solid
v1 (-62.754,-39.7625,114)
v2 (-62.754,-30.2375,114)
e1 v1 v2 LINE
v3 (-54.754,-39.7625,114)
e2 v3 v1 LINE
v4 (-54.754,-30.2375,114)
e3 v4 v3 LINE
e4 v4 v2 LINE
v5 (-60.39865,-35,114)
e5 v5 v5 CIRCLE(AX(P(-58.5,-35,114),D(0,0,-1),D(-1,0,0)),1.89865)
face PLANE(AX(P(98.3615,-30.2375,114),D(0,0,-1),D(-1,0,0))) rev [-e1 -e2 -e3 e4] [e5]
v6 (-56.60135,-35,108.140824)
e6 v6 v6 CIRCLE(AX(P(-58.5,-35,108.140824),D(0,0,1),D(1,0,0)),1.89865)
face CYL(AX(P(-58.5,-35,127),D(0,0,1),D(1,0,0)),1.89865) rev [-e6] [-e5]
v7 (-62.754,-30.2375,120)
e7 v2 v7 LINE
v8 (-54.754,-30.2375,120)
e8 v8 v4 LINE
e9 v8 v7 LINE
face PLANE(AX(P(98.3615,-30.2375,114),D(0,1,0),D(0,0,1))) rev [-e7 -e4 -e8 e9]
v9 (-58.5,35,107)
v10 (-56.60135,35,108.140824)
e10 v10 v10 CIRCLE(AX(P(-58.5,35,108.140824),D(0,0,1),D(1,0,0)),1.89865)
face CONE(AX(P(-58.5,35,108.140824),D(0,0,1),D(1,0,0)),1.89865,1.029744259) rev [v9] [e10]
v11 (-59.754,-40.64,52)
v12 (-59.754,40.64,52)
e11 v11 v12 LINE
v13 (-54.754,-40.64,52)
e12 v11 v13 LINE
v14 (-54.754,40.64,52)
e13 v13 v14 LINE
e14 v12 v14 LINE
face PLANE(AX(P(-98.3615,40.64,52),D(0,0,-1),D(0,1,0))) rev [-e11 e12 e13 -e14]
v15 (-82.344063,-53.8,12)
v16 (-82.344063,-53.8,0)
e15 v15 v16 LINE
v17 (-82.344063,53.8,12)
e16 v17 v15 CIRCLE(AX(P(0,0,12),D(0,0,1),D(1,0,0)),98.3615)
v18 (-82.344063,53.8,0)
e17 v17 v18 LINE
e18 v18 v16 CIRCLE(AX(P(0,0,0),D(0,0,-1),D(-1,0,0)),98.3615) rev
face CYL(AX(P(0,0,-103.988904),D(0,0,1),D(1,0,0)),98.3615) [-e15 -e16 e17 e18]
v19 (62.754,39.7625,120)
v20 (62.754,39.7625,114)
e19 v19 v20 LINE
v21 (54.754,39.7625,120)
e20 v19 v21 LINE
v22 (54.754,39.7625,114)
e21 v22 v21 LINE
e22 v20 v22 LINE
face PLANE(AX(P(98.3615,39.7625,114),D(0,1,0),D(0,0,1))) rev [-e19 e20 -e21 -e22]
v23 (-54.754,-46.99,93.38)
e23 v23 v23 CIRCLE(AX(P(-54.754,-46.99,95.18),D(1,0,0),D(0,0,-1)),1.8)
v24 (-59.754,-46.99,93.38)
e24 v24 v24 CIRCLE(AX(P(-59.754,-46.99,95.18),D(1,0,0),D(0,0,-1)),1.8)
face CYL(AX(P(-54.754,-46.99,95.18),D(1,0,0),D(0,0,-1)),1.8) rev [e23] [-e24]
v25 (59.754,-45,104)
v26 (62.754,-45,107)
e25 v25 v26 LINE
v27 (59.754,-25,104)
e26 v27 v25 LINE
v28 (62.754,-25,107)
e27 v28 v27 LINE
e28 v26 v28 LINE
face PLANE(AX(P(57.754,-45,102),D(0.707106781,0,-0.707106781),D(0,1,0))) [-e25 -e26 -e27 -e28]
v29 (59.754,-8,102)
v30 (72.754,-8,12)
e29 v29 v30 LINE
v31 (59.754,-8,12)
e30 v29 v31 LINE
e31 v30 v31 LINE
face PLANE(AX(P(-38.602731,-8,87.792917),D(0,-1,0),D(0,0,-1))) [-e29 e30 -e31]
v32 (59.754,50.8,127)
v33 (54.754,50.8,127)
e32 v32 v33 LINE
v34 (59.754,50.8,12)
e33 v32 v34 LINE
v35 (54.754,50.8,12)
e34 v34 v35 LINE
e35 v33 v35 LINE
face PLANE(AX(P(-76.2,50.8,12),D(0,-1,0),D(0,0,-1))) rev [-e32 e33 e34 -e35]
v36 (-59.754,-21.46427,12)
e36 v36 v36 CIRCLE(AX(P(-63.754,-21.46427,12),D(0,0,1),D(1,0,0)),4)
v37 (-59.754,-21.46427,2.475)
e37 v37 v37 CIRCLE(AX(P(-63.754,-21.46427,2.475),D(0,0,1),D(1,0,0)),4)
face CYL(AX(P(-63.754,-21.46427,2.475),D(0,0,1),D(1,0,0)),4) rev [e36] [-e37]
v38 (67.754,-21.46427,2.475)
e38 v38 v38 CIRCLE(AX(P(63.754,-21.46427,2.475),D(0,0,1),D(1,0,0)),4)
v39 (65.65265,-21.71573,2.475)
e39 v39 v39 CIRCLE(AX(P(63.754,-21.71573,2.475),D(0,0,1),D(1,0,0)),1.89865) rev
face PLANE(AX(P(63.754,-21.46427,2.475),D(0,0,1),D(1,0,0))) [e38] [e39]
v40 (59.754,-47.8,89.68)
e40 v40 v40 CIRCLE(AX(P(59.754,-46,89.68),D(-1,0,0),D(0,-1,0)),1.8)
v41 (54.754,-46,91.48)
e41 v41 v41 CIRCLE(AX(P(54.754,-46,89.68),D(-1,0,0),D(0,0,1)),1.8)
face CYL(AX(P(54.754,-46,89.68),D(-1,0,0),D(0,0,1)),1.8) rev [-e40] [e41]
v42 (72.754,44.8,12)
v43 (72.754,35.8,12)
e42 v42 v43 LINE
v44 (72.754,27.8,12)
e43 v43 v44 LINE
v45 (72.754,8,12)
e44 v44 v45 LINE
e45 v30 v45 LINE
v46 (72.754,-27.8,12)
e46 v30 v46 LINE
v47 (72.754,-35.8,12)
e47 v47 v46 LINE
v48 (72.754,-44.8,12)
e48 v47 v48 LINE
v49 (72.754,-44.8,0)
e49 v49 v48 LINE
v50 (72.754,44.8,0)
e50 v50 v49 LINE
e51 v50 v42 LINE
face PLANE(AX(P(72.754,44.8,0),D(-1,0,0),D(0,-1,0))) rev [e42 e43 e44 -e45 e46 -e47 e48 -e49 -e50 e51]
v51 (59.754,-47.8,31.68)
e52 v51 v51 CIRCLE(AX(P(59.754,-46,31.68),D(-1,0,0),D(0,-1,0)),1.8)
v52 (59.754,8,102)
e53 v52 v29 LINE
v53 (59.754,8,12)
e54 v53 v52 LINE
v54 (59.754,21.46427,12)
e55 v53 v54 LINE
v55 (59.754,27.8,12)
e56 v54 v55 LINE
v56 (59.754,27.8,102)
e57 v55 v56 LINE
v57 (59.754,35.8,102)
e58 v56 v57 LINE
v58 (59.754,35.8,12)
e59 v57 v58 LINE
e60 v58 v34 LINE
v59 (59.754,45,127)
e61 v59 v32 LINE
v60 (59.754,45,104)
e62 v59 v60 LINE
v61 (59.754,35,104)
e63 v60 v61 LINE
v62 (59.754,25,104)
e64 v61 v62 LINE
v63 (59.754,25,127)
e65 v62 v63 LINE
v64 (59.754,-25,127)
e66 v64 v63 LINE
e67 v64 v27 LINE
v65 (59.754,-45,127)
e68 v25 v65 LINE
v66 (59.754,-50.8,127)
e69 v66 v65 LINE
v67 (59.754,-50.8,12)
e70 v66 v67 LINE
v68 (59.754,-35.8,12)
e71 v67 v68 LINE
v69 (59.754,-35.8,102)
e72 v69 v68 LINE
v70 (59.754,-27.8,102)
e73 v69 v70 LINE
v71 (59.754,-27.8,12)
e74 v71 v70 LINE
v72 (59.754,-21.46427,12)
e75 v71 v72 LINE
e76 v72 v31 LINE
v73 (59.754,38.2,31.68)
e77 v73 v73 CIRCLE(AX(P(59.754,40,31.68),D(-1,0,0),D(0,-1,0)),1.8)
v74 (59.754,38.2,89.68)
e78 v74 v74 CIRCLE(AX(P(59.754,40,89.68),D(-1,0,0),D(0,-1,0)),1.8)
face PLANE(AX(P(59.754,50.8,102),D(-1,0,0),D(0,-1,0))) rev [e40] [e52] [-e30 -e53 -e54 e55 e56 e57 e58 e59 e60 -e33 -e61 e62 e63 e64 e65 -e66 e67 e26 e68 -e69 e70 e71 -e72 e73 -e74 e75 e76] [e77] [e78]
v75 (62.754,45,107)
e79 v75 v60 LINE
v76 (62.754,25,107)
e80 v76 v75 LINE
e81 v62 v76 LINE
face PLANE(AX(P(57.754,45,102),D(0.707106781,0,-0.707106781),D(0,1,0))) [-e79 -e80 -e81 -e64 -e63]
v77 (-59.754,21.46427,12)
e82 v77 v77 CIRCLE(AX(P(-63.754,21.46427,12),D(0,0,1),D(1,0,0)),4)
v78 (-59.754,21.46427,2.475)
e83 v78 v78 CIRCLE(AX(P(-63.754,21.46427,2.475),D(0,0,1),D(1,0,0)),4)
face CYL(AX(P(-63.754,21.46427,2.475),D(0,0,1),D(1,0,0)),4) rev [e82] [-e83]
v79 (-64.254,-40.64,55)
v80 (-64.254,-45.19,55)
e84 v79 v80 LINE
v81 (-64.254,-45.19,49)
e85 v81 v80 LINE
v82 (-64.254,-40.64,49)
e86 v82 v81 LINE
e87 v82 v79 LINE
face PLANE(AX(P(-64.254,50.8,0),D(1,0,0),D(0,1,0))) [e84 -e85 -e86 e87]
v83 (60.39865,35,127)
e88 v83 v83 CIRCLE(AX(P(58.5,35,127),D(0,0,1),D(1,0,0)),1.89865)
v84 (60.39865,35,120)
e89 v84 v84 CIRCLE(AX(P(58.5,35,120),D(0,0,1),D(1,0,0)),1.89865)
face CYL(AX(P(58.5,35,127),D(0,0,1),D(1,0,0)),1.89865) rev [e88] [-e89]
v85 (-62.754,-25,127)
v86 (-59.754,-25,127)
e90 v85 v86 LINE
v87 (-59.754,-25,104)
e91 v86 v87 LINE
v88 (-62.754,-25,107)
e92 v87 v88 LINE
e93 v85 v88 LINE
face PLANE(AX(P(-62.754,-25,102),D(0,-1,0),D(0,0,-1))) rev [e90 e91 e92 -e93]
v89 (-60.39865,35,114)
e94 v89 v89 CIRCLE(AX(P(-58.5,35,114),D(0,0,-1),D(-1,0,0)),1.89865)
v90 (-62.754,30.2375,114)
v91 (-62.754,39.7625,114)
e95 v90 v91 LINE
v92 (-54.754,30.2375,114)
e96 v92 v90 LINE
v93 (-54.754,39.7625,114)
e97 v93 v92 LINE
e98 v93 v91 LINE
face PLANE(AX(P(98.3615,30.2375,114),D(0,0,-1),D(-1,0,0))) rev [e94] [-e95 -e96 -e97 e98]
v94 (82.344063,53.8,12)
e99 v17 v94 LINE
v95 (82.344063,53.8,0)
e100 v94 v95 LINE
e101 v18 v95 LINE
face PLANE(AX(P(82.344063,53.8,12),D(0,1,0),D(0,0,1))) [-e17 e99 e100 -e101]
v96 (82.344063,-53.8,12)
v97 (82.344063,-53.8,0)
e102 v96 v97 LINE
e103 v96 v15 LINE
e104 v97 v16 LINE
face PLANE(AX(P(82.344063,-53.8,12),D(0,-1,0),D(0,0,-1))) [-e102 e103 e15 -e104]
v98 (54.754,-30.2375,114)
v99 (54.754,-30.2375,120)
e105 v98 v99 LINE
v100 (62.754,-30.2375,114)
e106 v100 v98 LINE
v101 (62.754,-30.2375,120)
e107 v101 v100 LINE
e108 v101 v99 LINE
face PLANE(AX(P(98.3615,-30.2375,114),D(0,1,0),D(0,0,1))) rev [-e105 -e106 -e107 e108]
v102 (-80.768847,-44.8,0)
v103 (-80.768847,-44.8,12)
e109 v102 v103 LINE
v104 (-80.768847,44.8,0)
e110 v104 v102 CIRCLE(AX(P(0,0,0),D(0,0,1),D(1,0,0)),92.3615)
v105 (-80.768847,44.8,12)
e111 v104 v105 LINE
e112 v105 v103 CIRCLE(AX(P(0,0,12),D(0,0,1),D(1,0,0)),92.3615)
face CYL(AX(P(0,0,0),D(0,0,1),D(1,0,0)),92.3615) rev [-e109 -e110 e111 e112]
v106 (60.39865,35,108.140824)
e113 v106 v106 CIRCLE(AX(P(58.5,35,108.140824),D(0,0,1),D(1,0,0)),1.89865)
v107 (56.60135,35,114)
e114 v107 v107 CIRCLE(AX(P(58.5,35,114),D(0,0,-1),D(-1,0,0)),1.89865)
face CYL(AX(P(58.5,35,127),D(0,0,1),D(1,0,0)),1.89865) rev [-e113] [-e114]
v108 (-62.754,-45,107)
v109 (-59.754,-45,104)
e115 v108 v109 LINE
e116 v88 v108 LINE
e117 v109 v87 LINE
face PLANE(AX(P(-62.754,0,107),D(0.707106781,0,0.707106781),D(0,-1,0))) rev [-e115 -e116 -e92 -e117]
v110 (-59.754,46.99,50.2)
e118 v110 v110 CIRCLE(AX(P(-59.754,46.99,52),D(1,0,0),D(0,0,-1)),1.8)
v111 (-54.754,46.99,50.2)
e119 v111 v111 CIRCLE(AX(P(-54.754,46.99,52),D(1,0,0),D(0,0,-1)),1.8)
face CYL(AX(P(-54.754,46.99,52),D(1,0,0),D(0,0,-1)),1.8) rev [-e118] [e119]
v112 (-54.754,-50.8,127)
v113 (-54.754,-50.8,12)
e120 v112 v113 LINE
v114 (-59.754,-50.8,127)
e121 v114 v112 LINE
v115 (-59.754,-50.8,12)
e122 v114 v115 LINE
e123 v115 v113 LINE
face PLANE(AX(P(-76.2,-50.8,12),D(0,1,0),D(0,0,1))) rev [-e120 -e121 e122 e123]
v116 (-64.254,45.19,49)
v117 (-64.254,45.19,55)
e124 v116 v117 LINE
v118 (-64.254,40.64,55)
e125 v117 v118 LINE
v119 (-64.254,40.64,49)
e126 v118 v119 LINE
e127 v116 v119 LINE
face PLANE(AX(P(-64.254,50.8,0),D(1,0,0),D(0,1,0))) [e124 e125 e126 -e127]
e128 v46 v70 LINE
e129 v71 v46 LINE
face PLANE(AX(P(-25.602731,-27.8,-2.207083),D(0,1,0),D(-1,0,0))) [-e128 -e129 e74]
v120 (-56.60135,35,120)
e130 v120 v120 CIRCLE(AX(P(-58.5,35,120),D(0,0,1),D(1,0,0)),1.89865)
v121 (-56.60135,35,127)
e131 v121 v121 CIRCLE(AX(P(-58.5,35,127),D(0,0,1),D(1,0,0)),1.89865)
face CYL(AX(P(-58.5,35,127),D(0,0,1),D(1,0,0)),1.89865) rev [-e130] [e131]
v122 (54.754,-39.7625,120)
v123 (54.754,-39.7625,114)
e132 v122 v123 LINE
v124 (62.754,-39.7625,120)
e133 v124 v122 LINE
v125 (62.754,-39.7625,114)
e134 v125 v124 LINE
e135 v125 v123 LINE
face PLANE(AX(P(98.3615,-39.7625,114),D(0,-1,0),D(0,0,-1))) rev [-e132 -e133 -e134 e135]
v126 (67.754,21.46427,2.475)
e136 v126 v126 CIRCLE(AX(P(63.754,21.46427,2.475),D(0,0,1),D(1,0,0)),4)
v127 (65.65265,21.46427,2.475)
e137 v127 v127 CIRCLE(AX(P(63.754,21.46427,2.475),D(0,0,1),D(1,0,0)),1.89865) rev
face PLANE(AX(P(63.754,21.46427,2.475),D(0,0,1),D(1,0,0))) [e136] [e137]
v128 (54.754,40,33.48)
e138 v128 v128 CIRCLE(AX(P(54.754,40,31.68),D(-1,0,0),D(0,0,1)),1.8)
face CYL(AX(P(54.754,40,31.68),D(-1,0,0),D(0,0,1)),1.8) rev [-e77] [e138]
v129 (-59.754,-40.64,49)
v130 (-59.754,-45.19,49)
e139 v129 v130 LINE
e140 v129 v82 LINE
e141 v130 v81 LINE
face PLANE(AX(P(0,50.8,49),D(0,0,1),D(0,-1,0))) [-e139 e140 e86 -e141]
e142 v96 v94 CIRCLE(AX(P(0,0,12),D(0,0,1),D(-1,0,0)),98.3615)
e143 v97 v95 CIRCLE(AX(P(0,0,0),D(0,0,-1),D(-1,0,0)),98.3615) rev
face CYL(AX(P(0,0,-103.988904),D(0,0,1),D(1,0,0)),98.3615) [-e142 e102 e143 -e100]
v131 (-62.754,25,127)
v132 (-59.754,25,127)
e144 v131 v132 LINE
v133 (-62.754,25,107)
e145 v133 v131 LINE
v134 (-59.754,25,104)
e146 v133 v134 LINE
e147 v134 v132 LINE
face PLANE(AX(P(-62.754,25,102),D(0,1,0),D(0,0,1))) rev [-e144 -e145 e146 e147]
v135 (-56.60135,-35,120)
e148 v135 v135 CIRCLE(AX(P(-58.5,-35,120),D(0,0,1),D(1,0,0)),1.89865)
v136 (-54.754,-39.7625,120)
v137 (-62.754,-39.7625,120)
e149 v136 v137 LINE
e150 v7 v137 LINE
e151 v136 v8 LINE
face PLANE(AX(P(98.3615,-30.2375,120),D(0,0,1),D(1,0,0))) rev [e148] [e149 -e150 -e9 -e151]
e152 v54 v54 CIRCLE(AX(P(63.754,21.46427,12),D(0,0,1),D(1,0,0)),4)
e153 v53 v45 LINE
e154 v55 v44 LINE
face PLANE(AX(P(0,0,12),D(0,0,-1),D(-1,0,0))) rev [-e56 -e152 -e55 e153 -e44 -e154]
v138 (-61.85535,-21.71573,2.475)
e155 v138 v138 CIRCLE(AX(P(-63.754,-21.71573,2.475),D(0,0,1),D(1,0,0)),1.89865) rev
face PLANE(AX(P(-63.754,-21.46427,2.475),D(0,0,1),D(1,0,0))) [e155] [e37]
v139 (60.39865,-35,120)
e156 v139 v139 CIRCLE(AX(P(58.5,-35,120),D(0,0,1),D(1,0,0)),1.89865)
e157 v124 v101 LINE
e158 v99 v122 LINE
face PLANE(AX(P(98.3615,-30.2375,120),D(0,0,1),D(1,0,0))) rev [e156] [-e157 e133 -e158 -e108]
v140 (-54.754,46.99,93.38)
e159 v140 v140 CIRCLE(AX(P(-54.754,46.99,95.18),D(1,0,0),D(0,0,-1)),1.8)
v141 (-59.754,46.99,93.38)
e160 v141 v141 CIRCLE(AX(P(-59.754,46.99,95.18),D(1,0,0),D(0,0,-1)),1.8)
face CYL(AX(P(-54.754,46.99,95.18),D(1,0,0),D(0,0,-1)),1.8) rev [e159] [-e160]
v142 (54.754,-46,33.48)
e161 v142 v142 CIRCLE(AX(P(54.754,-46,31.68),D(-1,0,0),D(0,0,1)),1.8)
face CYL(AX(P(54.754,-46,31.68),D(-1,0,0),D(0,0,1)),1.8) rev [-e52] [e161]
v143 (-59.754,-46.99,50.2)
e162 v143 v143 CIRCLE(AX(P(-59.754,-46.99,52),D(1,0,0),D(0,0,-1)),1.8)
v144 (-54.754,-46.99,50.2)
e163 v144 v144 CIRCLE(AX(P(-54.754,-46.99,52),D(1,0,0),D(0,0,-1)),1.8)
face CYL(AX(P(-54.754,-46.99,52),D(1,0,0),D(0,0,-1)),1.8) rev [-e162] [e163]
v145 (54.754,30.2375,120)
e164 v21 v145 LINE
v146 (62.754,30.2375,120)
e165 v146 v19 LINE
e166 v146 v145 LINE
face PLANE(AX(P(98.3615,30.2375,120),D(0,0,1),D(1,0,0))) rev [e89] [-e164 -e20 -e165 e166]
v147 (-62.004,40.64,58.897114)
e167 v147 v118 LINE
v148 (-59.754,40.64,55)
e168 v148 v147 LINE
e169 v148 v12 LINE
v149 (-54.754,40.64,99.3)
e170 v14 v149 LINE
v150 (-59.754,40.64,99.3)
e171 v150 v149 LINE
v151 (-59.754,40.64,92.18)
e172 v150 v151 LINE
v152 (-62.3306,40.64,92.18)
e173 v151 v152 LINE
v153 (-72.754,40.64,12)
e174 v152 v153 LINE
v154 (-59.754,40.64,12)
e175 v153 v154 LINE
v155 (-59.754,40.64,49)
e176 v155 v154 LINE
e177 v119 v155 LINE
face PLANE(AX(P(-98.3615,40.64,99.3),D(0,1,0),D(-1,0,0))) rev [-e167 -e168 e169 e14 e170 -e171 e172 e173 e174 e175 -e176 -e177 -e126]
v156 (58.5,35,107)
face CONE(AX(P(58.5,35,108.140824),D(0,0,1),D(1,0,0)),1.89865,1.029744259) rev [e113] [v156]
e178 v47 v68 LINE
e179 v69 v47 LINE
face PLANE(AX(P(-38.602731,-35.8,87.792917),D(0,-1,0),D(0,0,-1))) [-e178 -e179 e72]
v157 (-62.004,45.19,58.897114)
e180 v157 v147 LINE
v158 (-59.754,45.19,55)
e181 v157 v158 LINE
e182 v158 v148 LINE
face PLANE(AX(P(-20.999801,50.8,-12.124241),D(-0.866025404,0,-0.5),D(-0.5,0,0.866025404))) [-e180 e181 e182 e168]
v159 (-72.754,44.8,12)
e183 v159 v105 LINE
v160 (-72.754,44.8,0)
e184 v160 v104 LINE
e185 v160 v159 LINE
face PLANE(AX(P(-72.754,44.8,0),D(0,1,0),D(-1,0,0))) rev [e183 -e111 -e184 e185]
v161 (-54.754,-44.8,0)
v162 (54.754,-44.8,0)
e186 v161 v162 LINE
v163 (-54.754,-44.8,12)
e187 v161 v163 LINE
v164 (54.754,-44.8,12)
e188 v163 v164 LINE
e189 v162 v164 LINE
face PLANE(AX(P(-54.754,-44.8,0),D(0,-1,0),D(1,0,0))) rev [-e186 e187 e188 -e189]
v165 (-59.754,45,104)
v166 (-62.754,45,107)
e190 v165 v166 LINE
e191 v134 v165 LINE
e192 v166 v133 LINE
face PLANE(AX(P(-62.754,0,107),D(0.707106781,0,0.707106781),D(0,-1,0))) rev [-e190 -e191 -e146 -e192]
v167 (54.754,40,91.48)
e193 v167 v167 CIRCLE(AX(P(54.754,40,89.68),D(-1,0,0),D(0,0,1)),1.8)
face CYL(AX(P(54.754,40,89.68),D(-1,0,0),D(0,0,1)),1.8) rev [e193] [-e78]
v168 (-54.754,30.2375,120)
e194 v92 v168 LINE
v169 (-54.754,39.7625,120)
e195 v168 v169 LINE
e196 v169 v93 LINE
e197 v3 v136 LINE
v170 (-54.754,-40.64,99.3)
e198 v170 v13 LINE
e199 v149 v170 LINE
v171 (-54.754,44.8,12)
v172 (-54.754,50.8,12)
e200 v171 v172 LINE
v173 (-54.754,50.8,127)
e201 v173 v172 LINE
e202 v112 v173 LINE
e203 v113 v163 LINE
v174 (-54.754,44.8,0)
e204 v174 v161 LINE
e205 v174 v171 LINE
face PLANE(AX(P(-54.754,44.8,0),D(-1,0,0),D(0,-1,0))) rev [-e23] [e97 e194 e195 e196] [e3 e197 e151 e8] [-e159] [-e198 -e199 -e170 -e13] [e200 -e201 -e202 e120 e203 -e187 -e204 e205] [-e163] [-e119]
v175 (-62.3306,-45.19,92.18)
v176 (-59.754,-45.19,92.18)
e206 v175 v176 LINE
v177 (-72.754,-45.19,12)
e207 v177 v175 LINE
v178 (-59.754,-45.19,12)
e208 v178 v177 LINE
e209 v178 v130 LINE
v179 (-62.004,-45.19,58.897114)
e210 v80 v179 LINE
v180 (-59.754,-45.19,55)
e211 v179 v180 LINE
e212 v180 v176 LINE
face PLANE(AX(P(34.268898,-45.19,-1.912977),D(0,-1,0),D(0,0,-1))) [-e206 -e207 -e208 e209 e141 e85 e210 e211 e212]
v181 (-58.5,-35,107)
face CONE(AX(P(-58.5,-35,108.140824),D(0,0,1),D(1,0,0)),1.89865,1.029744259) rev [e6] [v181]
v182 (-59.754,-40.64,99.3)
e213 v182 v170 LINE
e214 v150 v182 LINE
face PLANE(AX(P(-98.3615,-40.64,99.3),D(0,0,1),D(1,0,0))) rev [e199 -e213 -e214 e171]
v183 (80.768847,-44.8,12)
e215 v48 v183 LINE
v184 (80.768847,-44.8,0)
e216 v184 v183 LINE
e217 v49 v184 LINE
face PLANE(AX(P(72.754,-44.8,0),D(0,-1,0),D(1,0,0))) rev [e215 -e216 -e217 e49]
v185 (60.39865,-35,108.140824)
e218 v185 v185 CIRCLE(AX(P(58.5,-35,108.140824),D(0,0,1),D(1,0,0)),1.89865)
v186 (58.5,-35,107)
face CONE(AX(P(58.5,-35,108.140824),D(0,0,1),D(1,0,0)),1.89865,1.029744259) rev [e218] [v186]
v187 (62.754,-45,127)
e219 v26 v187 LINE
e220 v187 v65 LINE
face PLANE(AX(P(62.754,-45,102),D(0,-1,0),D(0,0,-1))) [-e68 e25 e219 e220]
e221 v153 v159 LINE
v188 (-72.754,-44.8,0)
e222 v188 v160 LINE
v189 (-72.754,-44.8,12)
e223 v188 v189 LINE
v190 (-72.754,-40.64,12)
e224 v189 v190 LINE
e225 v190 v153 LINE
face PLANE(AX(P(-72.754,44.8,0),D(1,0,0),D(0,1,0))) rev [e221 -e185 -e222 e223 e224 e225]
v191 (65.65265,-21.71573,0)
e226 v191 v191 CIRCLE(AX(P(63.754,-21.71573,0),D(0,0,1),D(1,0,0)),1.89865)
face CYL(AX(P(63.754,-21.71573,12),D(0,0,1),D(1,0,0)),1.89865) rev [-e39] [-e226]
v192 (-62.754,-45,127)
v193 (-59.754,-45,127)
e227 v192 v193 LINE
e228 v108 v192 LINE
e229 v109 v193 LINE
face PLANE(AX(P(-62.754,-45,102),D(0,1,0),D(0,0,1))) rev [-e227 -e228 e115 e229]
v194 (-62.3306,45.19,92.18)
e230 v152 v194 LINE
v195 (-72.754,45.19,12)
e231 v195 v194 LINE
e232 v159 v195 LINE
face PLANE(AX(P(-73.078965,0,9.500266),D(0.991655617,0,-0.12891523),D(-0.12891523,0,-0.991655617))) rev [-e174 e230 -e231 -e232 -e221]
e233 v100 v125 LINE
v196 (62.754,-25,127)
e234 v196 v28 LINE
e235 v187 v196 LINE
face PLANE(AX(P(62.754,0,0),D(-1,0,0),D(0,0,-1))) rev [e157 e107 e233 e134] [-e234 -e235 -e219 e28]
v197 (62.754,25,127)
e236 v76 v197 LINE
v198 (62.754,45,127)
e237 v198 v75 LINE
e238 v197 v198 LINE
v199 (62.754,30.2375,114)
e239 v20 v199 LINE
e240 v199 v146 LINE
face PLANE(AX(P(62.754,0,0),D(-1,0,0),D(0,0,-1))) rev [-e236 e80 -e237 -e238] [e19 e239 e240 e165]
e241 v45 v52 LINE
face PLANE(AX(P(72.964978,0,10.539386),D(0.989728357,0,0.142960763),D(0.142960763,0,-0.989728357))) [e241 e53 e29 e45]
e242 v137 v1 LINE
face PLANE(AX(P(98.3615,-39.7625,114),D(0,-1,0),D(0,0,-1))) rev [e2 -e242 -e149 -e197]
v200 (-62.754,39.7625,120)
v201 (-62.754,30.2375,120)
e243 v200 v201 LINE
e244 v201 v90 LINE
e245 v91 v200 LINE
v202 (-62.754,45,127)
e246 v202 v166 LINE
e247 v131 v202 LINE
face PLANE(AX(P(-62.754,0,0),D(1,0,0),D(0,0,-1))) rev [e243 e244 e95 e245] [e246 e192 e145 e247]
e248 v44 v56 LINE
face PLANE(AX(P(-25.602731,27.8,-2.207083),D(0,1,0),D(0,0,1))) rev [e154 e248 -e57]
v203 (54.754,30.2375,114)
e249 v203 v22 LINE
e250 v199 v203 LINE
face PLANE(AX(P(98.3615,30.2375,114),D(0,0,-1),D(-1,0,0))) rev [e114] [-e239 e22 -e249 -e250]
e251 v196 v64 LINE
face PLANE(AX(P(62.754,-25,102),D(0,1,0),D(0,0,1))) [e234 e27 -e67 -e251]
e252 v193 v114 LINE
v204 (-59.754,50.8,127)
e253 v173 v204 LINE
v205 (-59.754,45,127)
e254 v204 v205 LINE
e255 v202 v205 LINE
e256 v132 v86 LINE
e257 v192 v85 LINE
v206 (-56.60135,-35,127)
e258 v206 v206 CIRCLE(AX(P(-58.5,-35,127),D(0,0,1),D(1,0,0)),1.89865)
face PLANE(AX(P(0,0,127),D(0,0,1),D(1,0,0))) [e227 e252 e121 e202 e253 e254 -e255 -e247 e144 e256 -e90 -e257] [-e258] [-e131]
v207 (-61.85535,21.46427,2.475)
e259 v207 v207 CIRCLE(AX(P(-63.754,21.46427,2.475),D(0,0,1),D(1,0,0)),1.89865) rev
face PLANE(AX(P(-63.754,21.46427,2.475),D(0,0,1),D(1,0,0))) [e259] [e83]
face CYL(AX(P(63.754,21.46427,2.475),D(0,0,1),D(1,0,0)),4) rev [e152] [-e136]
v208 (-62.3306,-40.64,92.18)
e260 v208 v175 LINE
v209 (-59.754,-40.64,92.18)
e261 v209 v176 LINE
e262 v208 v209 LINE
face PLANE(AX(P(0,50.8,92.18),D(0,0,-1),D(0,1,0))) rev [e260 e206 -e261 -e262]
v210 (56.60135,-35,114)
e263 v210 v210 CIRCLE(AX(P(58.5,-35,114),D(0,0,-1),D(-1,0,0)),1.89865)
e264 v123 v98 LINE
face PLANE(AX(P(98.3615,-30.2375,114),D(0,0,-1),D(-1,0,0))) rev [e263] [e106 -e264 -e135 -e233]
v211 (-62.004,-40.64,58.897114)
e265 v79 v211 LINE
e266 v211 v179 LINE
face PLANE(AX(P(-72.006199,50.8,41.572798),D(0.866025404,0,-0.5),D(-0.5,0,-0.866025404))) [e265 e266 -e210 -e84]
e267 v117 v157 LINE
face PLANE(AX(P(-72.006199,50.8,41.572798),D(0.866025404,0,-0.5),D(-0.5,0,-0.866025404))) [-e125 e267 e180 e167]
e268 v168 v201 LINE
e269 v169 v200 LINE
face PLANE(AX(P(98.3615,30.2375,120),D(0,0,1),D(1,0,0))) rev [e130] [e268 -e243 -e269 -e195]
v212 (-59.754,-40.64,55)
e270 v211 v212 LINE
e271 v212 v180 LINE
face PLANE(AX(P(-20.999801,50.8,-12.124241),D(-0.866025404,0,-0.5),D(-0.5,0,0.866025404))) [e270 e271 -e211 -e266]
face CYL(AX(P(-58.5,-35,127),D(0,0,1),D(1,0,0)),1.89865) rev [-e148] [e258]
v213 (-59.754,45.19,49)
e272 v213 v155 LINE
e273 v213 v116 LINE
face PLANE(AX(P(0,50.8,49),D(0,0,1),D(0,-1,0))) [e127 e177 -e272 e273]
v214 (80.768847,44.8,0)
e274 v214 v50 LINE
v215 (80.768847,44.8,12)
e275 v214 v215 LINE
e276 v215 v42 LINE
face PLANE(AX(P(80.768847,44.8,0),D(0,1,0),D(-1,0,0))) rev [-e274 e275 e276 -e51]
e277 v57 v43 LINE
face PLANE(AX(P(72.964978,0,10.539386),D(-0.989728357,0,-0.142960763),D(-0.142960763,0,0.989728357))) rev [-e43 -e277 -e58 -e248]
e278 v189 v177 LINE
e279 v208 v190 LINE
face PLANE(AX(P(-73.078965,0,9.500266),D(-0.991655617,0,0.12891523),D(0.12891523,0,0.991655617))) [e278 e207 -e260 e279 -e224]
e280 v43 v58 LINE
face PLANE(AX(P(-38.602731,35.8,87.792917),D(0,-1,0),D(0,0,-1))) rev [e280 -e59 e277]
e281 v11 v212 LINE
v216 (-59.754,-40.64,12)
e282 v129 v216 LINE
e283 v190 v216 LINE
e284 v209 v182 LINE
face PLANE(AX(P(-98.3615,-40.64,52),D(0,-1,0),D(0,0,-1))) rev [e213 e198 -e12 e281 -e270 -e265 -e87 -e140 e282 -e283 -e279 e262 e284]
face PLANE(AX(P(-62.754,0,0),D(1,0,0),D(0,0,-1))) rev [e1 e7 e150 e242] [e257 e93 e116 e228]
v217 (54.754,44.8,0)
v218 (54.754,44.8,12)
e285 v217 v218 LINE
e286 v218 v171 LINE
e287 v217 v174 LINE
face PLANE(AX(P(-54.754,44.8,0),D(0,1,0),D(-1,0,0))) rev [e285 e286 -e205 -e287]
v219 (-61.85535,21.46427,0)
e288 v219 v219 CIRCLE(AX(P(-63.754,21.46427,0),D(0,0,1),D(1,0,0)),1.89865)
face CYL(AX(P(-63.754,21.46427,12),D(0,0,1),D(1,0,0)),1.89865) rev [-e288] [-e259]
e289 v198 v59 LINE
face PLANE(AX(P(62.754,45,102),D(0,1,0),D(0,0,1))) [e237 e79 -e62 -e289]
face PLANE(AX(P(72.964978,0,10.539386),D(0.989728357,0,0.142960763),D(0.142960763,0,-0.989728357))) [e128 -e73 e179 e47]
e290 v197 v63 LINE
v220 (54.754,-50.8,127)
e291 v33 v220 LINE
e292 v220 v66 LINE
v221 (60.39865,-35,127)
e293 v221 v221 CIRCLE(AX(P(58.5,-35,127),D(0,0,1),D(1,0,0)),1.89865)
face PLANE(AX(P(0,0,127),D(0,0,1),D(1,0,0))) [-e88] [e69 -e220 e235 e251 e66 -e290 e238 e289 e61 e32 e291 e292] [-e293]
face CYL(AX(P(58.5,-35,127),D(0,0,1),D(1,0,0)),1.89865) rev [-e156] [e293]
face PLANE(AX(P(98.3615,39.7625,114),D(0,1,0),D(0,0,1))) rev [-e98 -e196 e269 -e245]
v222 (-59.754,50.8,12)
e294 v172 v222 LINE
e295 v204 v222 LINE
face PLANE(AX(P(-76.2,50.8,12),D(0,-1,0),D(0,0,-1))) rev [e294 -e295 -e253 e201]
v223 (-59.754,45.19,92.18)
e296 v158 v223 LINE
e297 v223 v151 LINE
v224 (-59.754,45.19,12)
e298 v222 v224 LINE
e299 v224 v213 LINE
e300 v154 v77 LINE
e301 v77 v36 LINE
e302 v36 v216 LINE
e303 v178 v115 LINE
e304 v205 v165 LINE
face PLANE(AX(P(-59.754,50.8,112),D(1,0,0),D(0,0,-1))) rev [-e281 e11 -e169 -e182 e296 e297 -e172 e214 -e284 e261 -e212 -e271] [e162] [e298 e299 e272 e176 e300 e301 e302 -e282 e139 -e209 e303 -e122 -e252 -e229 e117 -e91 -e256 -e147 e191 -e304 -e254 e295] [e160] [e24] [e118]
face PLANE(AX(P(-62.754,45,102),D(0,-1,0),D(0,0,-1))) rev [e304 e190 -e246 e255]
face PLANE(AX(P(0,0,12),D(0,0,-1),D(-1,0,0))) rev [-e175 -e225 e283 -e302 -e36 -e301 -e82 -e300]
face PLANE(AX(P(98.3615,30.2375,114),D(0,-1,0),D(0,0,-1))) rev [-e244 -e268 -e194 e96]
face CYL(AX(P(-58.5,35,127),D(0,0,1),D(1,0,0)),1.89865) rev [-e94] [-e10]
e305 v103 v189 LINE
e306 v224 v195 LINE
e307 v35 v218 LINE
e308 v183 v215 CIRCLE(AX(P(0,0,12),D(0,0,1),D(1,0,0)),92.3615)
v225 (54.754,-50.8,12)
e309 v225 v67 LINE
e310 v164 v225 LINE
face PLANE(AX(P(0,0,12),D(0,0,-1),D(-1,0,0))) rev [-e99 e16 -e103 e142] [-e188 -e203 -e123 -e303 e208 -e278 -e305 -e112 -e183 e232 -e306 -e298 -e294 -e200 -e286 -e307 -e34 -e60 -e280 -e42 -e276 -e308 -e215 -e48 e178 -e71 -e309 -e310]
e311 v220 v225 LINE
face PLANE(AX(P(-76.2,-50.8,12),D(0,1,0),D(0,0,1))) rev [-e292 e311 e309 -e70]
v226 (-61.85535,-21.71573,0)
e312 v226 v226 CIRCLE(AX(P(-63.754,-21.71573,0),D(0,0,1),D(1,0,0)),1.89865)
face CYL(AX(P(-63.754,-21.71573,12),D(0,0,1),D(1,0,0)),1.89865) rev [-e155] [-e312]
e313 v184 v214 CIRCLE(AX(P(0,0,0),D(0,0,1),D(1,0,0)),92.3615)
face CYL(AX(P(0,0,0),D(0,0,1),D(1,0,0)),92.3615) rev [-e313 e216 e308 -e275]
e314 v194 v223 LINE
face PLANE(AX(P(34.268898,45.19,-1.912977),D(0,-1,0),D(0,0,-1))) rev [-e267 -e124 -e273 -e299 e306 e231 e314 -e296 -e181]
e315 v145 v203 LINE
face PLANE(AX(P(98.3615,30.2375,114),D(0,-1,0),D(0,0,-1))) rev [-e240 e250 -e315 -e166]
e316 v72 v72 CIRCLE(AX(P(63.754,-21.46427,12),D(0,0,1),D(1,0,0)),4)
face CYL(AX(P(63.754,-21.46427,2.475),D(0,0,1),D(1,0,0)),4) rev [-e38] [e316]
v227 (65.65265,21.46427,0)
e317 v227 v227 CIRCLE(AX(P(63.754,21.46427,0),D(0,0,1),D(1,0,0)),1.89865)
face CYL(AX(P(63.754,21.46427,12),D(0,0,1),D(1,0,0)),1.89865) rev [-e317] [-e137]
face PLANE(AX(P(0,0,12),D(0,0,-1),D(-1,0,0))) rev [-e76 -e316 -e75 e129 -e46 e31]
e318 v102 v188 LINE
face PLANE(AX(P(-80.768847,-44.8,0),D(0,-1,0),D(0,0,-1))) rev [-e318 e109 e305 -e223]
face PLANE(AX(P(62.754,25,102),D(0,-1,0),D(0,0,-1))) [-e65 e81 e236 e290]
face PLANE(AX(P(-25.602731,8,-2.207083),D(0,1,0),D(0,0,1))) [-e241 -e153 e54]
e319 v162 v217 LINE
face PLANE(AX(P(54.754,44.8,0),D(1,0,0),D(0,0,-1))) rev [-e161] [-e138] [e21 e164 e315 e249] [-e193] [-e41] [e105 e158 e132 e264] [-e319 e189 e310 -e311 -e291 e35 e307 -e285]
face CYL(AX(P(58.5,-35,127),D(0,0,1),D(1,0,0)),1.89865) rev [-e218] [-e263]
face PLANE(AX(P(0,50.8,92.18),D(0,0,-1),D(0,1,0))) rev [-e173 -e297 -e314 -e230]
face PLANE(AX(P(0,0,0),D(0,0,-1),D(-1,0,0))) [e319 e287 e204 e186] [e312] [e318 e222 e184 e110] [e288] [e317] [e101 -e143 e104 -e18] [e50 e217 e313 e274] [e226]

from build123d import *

# Parameters (mm, degrees)
SKETCH1_W                 = 152.4
SKETCH1_H                 = 101.6
BOSS_EXTRUDE1_DEPTH       = 12
F_6_CLEARANCE_HOLE1_D     = 3.7973
BOSS_EXTRUDE2_DEPTH       = 12
SKETCH6_R                 = 4
CUT_EXTRUDE2_DEPTH        = 9.525
SKETCH5_W                 = 109.508
SKETCH5_H                 = 89.6
CUT_EXTRUDE1_DEPTH        = 112.353602017
SKETCH7_W                 = 5
SKETCH7_H                 = 101.6
BOSS_EXTRUDE3_DEPTH       = 100
M3_CLEARANCE_HOLE1_D      = 3.6
SKETCH9_W                 = 47.3
SKETCH9_H                 = 81.28
CUT_EXTRUDE3_DEPTH        = 197.389908957
BOSS_EXTRUDE4_START       = -45.19
BOSS_EXTRUDE4_DEPTH       = 4.55
BOSS_EXTRUDE4_START_2     = 40.64
BOSS_EXTRUDE4_2_DEPTH     = 4.55
CUT_EXTRUDE7_DEPTH        = 178.293724599
CUT_EXTRUDE7_DEPTH_BACK   = 178.293724599
SKETCH12_W                = 5
SKETCH12_H                = 101.6
BOSS_EXTRUDE5_DEPTH       = 90
M3_CLEARANCE_HOLE2_D      = 3.6
M3_CLEARANCE_HOLE2_DEPTH  = 43.6075
BOSS_EXTRUDE6_REACH       = 207.494
SKETCH14_W                = 90.93404203
SKETCH14_H                = 16
SKETCH14_H_2              = 8
BOSS_EXTRUDE7_DEPTH       = 25
BOSS_EXTRUDE8_REACH       = 170.477
SKETCH16_W                = 5
SKETCH16_H                = 101.6
SKETCH27_W                = 25
SKETCH27_H                = 20
BOSS_EXTRUDE10_DEPTH      = 3
CHAMFER1_SIZE             = 5
CHAMFER1_OF_MIRROR1_SIZE  = 5
CUT_EXTRUDE6_DEPTH        = 210.069728417
CUT_EXTRUDE6_DEPTH_BACK   = 210.069728417
SKETCH19_W                = 6
SKETCH19_H                = 9.525
BOSS_EXTRUDE9_START       = -12
BOSS_EXTRUDE9_DEPTH       = 12
F_6_CLEARANCE_HOLE2_D     = 3.7973
F_6_CLEARANCE_HOLE2_DEPTH = 18.859175986
F_6_CLEARANCE_HOLE2_TIP   = 1.140824014


# Read off the part's stored shape, not the designer's step: Boss-Extrude4
with BuildPart() as part:
    # Sketch1 → Boss-Extrude1 (new body)
    with BuildSketch(Plane.XY):
        Rectangle(SKETCH1_W, SKETCH1_H)
    extrude(amount=BOSS_EXTRUDE1_DEPTH)

    # #6 Clearance Hole1 (through all)
    with Locations(Plane(origin=(-63.754, 21.46427, 12), x_dir=(1, 0, 0), z_dir=(0, 0, 1))):
        with Locations((0, 0), (127.508, 0), (127.508, -43.18), (0, -43.18), (63.754, 0), (63.754, -43.18)):
            Hole(F_6_CLEARANCE_HOLE1_D / 2)

    # Sketch4 → Boss-Extrude2 (add)
    with BuildSketch(Plane.XY.offset(12)):
        with BuildLine():
            Line((-76.2, 50.8), (-84.22793291, 50.8))
            ThreePointArc((-84.22793291, 50.8), (-98.3615, 0), (-84.22793291, -50.8))
            Line((-84.22793291, -50.8), (-76.2, -50.8))
            Line((-76.2, -50.8), (-76.2, 50.8))
        make_face()
        with BuildLine():
            Line((76.2, -50.8), (84.22793291, -50.8))
            ThreePointArc((84.22793291, -50.8), (98.3615, 0), (84.22793291, 50.8))
            Line((84.22793291, 50.8), (76.2, 50.8))
            Line((76.2, 50.8), (76.2, -50.8))
        make_face()
    extrude(amount=-BOSS_EXTRUDE2_DEPTH)

    # Sketch6 → Cut-Extrude2 (cut)
    with BuildSketch(Plane.XY.offset(12)):
        with Locations((-63.754, 21.46427)):
            Circle(SKETCH6_R)
        with Locations((63.754, 21.46427)):
            Circle(SKETCH6_R)
        with Locations((63.754, -21.46427)):
            Circle(SKETCH6_R)
        with Locations((-63.754, -21.46427)):
            Circle(SKETCH6_R)
    extrude(amount=-CUT_EXTRUDE2_DEPTH, mode=Mode.SUBTRACT)

    # Sketch5 → Cut-Extrude1 (cut, through all)
    with BuildSketch(Plane.XY.offset(12)):
        with BuildLine():
            Line((-72.754, 44.8), (-72.754, -44.8))
            Line((-72.754, -44.8), (-80.768847226, -44.8))
            ThreePointArc((-80.768847226, -44.8), (-92.3615, 0), (-80.768847226, 44.8))
            Line((-80.768847226, 44.8), (-72.754, 44.8))
        make_face()
        with BuildLine():
            Line((72.754, 44.8), (72.754, -44.8))
            Line((72.754, -44.8), (80.768847226, -44.8))
            ThreePointArc((80.768847226, -44.8), (92.3615, 0), (80.768847226, 44.8))
            Line((80.768847226, 44.8), (72.754, 44.8))
        make_face()
        Rectangle(SKETCH5_W, SKETCH5_H)
    extrude(amount=-CUT_EXTRUDE1_DEPTH, mode=Mode.SUBTRACT)

    # Sketch7 → Boss-Extrude3 (add)
    with BuildSketch(Plane.XY.offset(12)):
        with Locations((-57.254, 0)):
            Rectangle(SKETCH7_W, SKETCH7_H)
    extrude(amount=BOSS_EXTRUDE3_DEPTH)

    # M3 Clearance Hole1 (through all)
    with Locations(Plane(origin=(-54.754, 46.99, 95.18), x_dir=(0, 1, 0), z_dir=(1, 0, 0))):
        with Locations((0, 0), (0, -43.18), (-93.98, -43.18), (-93.98, 0)):
            Hole(M3_CLEARANCE_HOLE1_D / 2)

    # Sketch9 → Cut-Extrude3 (cut, through all)
    with BuildSketch(Plane(origin=(-54.754, 0, 0), x_dir=(0, 0, -1), z_dir=(1, 0, 0))):
        with Locations((-75.65, 0)):
            Rectangle(SKETCH9_W, SKETCH9_H)
    extrude(amount=-CUT_EXTRUDE3_DEPTH, mode=Mode.SUBTRACT)

    # Boss-Extrude4 outline → Boss-Extrude4 (add)
    with BuildSketch(Plane(origin=(0, 0, 0), x_dir=(1, 0, 0), z_dir=(0, 1, 0)).offset(BOSS_EXTRUDE4_START)):
        Polygon((-59.754, -12), (-72.754, -12), (-59.754, -112), align=None)
    extrude(amount=BOSS_EXTRUDE4_DEPTH)

    # Boss-Extrude4 2 outline → Boss-Extrude4 2 (add)
    with BuildSketch(Plane(origin=(0, 0, 0), x_dir=(1, 0, 0), z_dir=(0, 1, 0)).offset(BOSS_EXTRUDE4_START_2)):
        Polygon((-59.754, -12), (-72.754, -12), (-59.754, -112), align=None)
    extrude(amount=BOSS_EXTRUDE4_2_DEPTH)

    # Sketch25 → Cut-Extrude7 (cut, two sides: drawn at the far end of the back side and taken through both)
    with BuildSketch(Plane.XZ.offset(45.19).offset(-CUT_EXTRUDE7_DEPTH_BACK)):
        Polygon((-59.754, 112), (-62.3306, 92.18), (-59.754, 92.18), align=None)
        Polygon((-59.754, 49), (-59.754, 55), (-62.004, 58.897114317), (-64.254, 55), (-64.254, 49), align=None)
    extrude(amount=CUT_EXTRUDE7_DEPTH + CUT_EXTRUDE7_DEPTH_BACK, mode=Mode.SUBTRACT)

    # Sketch12 → Boss-Extrude5 (add)
    with BuildSketch(Plane.XY.offset(12)):
        with Locations((57.254, 0)):
            Rectangle(SKETCH12_W, SKETCH12_H)
    extrude(amount=BOSS_EXTRUDE5_DEPTH)

    # M3 Clearance Hole2
    with Locations(Plane(origin=(54.754, -46, 89.68), x_dir=(0, 0, -1), z_dir=(-1, 0, 0))):
        with Locations((0, 0), (58, 0), (58, -86), (0, -86)):
            Hole(M3_CLEARANCE_HOLE2_D / 2, depth=M3_CLEARANCE_HOLE2_DEPTH)

    # Boss-Extrude6: up to this face of the body (flat: up to its plane)
    boss_extrude6_end = Plane(part.part.faces().sort_by_distance((59.754, 0.013417697, 56.983540958))[0])
    # Sketch14 → Boss-Extrude6 (add, up to the picked face)
    with BuildSketch(Plane(origin=(72.964977627, 0, 10.539385657), x_dir=(-0.14296076265523758, 0, 0.9897283568439539), z_dir=(-0.9897283568439539, 0, -0.14296076265523758)), mode=Mode.PRIVATE) as boss_extrude6_sk1:
        with Locations((46.942793971, 0)):
            Rectangle(SKETCH14_W, SKETCH14_H)
    boss_extrude6_tool1 = split(extrude(boss_extrude6_sk1.sketch, amount=BOSS_EXTRUDE6_REACH, mode=Mode.PRIVATE), bisect_by=boss_extrude6_end, keep=Keep.BOTH, mode=Mode.PRIVATE)
    # Sketch14 → Boss-Extrude6 (add, up to the picked face)
    with BuildSketch(Plane(origin=(72.964977627, 0, 10.539385657), x_dir=(-0.14296076265523758, 0, 0.9897283568439539), z_dir=(-0.9897283568439539, 0, -0.14296076265523758)), mode=Mode.PRIVATE) as boss_extrude6_sk2:
        with Locations((46.942793971, -31.8)):
            Rectangle(SKETCH14_W, SKETCH14_H_2)
    boss_extrude6_tool2 = split(extrude(boss_extrude6_sk2.sketch, amount=BOSS_EXTRUDE6_REACH, mode=Mode.PRIVATE), bisect_by=boss_extrude6_end, keep=Keep.BOTH, mode=Mode.PRIVATE)
    # Sketch14 → Boss-Extrude6 (add, up to the picked face)
    with BuildSketch(Plane(origin=(72.964977627, 0, 10.539385657), x_dir=(-0.14296076265523758, 0, 0.9897283568439539), z_dir=(-0.9897283568439539, 0, -0.14296076265523758)), mode=Mode.PRIVATE) as boss_extrude6_sk3:
        with Locations((46.942793971, 31.8)):
            Rectangle(SKETCH14_W, SKETCH14_H_2)
    boss_extrude6_tool3 = split(extrude(boss_extrude6_sk3.sketch, amount=BOSS_EXTRUDE6_REACH, mode=Mode.PRIVATE), bisect_by=boss_extrude6_end, keep=Keep.BOTH, mode=Mode.PRIVATE)
    add(boss_extrude6_tool1.solids().sort_by(Axis((66.254, 0, 57), (-0.9897283568439539, 0, -0.14296076265523758)))[0])
    add(boss_extrude6_tool2.solids().sort_by(Axis((66.254, -31.8, 57), (-0.9897283568439539, 0, -0.14296076265523758)))[0])
    add(boss_extrude6_tool3.solids().sort_by(Axis((66.254, 31.8, 57), (-0.9897283568439539, 0, -0.14296076265523758)))[0])

    # Sketch15 → Boss-Extrude7 (add)
    with BuildSketch(Plane.XY.offset(102)):
        Polygon((59.754, -8), (59.754, 8), (59.754, 27.8), (59.754, 35.8), (59.754, 50.8), (54.754, 50.8), (54.754, -50.8), (59.754, -50.8), (59.754, -35.8), (59.754, -27.8), align=None)
    extrude(amount=BOSS_EXTRUDE7_DEPTH)

    # Sketch16 → Boss-Extrude8 (add, up to next)
    with BuildSketch(Plane.XY.offset(127), mode=Mode.PRIVATE) as boss_extrude8_sk1:
        with Locations((-57.254, 0)):
            Rectangle(SKETCH16_W, SKETCH16_H)
    boss_extrude8_tool1 = extrude(boss_extrude8_sk1.sketch, amount=-BOSS_EXTRUDE8_REACH, mode=Mode.PRIVATE) - part.part
    add(boss_extrude8_tool1.solids().sort_by_distance((-57.254, 0, 127))[0])

    # Sketch27 → Boss-Extrude10 (add)
    with BuildSketch(Plane.ZY.offset(59.754)):
        with Locations((114.5, 35)):
            Rectangle(SKETCH27_W, SKETCH27_H)
        with Locations((114.5, -35)):
            Rectangle(SKETCH27_W, SKETCH27_H)
    boss_extrude10 = extrude(amount=BOSS_EXTRUDE10_DEPTH)

    # Chamfer1
    # the kernel refuses this chamfer: 5 mm, written as the material it takes off along each edge
    with BuildSketch(Plane(origin=(-62.754, -57.85841494, 102), x_dir=(0.9996219169112968, 0, -0.0274958766105877), z_dir=(0, 1, 0))) as chamfer1_piece_1_section:
        Polygon((CHAMFER1_SIZE * 0.999621916911, -CHAMFER1_SIZE * 0.0274958766106), (-CHAMFER1_SIZE * 0.0274958766106, -CHAMFER1_SIZE * 0.999621916911), (0, 0), align=None)
    chamfer1_piece_1 = extrude(amount=45.71682988, mode=Mode.PRIVATE)
    chamfer1_piece_1 = split(chamfer1_piece_1, bisect_by=Plane(origin=(-59.754, -35, 103.875047298), z_dir=(-1, 0, 0)), keep=Keep.TOP, mode=Mode.PRIVATE)
    add(chamfer1_piece_1, mode=Mode.SUBTRACT)
    with BuildSketch(Plane(origin=(-62.754, 12.14158506, 102), x_dir=(0.9996219169112968, 0, -0.0274958766105877), z_dir=(0, 1, 0))) as chamfer1_piece_2_section:
        Polygon((CHAMFER1_SIZE * 0.999621916911, -CHAMFER1_SIZE * 0.0274958766106), (-CHAMFER1_SIZE * 0.0274958766106, -CHAMFER1_SIZE * 0.999621916911), (0, 0), align=None)
    chamfer1_piece_2 = extrude(amount=45.71682988, mode=Mode.PRIVATE)
    chamfer1_piece_2 = split(chamfer1_piece_2, bisect_by=Plane(origin=(-59.754, 35, 103.875047298), z_dir=(-1, 0, 0)), keep=Keep.TOP, mode=Mode.PRIVATE)
    add(chamfer1_piece_2, mode=Mode.SUBTRACT)

    # Mirror1: Boss-Extrude10 across plane
    add(boss_extrude10.mirror(Plane(origin=(0, 0, 0), x_dir=(0, 0, 1), z_dir=(1, 0, 0))))

    # Chamfer1 of Mirror1
    # the kernel refuses this chamfer: 5 mm, written as the material it takes off along each edge
    with BuildSketch(Plane(origin=(62.754, -57.85841494, 102), x_dir=(-0.9996219169112968, 0, -0.0274958766105877), z_dir=(0, 1, 0))) as chamfer1_of_mirror1_piece_1_section:
        Polygon((CHAMFER1_OF_MIRROR1_SIZE * 0.999621916911, CHAMFER1_OF_MIRROR1_SIZE * 0.0274958766106), (-CHAMFER1_OF_MIRROR1_SIZE * 0.0274958766106, CHAMFER1_OF_MIRROR1_SIZE * 0.999621916911), (0, 0), align=None)
    chamfer1_of_mirror1_piece_1 = extrude(amount=45.71682988, mode=Mode.PRIVATE)
    chamfer1_of_mirror1_piece_1 = split(chamfer1_of_mirror1_piece_1, bisect_by=Plane(origin=(59.754, -35, 103.875206366), z_dir=(1, 0, 0)), keep=Keep.TOP, mode=Mode.PRIVATE)
    chamfer1_of_mirror1_piece_1 = split(chamfer1_of_mirror1_piece_1, bisect_by=Plane(origin=(59.525120657, -35, 103.584549298), z_dir=(0.9897283568439539, 0, 0.14296076265523758)), keep=Keep.TOP, mode=Mode.PRIVATE)
    add(chamfer1_of_mirror1_piece_1, mode=Mode.SUBTRACT)
    with BuildSketch(Plane(origin=(62.754, 12.14158506, 102), x_dir=(-0.9996219169112968, 0, -0.0274958766105877), z_dir=(0, 1, 0))) as chamfer1_of_mirror1_piece_2_section:
        Polygon((CHAMFER1_OF_MIRROR1_SIZE * 0.999621916911, CHAMFER1_OF_MIRROR1_SIZE * 0.0274958766106), (-CHAMFER1_OF_MIRROR1_SIZE * 0.0274958766106, CHAMFER1_OF_MIRROR1_SIZE * 0.999621916911), (0, 0), align=None)
    chamfer1_of_mirror1_piece_2 = extrude(amount=45.71682988, mode=Mode.PRIVATE)
    chamfer1_of_mirror1_piece_2 = split(chamfer1_of_mirror1_piece_2, bisect_by=Plane(origin=(59.754, 35, 103.875206366), z_dir=(1, 0, 0)), keep=Keep.TOP, mode=Mode.PRIVATE)
    chamfer1_of_mirror1_piece_2 = split(chamfer1_of_mirror1_piece_2, bisect_by=Plane(origin=(59.525120657, 35, 103.584549298), z_dir=(0.9897283568439539, 0, 0.14296076265523758)), keep=Keep.TOP, mode=Mode.PRIVATE)
    add(chamfer1_of_mirror1_piece_2, mode=Mode.SUBTRACT)

    # Sketch19 → Cut-Extrude6 (cut, two sides: drawn at the far end of the back side and taken through both)
    with BuildSketch(Plane.ZY.offset(59.754).offset(-CUT_EXTRUDE6_DEPTH_BACK)):
        with Locations((117, 35)):
            Rectangle(SKETCH19_W, SKETCH19_H)
        with Locations((117, -35)):
            Rectangle(SKETCH19_W, SKETCH19_H)
    extrude(amount=CUT_EXTRUDE6_DEPTH + CUT_EXTRUDE6_DEPTH_BACK, mode=Mode.SUBTRACT)

    # Sketch20 → Boss-Extrude9 (add)
    with BuildSketch(Plane(origin=(0, 0, 0), x_dir=(-1, 0, 0), z_dir=(0, 0, -1)).offset(BOSS_EXTRUDE9_START)):
        with BuildLine():
            Line((-82.344062823, 53.8), (82.344062823, 53.8))
            ThreePointArc((82.344062823, 53.8), (83.299504444, 52.308481546), (84.22793291, 50.8))
            Line((84.22793291, 50.8), (-84.22793291, 50.8))
            ThreePointArc((-84.22793291, 50.8), (-83.299504444, 52.308481546), (-82.344062823, 53.8))
        make_face()
        with BuildLine():
            Line((-84.22793291, -50.8), (84.22793291, -50.8))
            ThreePointArc((84.22793291, -50.8), (83.299504444, -52.308481546), (82.344062823, -53.8))
            Line((82.344062823, -53.8), (-82.344062823, -53.8))
            ThreePointArc((-82.344062823, -53.8), (-83.299504444, -52.308481546), (-84.22793291, -50.8))
        make_face()
    extrude(amount=BOSS_EXTRUDE9_DEPTH)

    # #6 Clearance Hole2
    with Locations(Plane(origin=(-58.5, 35, 127), x_dir=(1, 0, 0), z_dir=(0, 0, 1))):
        with Locations((0, 0), (117, 0), (117, -70), (0, -70)):
            Hole(F_6_CLEARANCE_HOLE2_D / 2, depth=F_6_CLEARANCE_HOLE2_DEPTH)
            with Locations((0, 0, -(F_6_CLEARANCE_HOLE2_DEPTH + F_6_CLEARANCE_HOLE2_TIP / 2))):  # 118° drill point
                Cone(0, F_6_CLEARANCE_HOLE2_D / 2, F_6_CLEARANCE_HOLE2_TIP, mode=Mode.SUBTRACT)


solid = part.part
